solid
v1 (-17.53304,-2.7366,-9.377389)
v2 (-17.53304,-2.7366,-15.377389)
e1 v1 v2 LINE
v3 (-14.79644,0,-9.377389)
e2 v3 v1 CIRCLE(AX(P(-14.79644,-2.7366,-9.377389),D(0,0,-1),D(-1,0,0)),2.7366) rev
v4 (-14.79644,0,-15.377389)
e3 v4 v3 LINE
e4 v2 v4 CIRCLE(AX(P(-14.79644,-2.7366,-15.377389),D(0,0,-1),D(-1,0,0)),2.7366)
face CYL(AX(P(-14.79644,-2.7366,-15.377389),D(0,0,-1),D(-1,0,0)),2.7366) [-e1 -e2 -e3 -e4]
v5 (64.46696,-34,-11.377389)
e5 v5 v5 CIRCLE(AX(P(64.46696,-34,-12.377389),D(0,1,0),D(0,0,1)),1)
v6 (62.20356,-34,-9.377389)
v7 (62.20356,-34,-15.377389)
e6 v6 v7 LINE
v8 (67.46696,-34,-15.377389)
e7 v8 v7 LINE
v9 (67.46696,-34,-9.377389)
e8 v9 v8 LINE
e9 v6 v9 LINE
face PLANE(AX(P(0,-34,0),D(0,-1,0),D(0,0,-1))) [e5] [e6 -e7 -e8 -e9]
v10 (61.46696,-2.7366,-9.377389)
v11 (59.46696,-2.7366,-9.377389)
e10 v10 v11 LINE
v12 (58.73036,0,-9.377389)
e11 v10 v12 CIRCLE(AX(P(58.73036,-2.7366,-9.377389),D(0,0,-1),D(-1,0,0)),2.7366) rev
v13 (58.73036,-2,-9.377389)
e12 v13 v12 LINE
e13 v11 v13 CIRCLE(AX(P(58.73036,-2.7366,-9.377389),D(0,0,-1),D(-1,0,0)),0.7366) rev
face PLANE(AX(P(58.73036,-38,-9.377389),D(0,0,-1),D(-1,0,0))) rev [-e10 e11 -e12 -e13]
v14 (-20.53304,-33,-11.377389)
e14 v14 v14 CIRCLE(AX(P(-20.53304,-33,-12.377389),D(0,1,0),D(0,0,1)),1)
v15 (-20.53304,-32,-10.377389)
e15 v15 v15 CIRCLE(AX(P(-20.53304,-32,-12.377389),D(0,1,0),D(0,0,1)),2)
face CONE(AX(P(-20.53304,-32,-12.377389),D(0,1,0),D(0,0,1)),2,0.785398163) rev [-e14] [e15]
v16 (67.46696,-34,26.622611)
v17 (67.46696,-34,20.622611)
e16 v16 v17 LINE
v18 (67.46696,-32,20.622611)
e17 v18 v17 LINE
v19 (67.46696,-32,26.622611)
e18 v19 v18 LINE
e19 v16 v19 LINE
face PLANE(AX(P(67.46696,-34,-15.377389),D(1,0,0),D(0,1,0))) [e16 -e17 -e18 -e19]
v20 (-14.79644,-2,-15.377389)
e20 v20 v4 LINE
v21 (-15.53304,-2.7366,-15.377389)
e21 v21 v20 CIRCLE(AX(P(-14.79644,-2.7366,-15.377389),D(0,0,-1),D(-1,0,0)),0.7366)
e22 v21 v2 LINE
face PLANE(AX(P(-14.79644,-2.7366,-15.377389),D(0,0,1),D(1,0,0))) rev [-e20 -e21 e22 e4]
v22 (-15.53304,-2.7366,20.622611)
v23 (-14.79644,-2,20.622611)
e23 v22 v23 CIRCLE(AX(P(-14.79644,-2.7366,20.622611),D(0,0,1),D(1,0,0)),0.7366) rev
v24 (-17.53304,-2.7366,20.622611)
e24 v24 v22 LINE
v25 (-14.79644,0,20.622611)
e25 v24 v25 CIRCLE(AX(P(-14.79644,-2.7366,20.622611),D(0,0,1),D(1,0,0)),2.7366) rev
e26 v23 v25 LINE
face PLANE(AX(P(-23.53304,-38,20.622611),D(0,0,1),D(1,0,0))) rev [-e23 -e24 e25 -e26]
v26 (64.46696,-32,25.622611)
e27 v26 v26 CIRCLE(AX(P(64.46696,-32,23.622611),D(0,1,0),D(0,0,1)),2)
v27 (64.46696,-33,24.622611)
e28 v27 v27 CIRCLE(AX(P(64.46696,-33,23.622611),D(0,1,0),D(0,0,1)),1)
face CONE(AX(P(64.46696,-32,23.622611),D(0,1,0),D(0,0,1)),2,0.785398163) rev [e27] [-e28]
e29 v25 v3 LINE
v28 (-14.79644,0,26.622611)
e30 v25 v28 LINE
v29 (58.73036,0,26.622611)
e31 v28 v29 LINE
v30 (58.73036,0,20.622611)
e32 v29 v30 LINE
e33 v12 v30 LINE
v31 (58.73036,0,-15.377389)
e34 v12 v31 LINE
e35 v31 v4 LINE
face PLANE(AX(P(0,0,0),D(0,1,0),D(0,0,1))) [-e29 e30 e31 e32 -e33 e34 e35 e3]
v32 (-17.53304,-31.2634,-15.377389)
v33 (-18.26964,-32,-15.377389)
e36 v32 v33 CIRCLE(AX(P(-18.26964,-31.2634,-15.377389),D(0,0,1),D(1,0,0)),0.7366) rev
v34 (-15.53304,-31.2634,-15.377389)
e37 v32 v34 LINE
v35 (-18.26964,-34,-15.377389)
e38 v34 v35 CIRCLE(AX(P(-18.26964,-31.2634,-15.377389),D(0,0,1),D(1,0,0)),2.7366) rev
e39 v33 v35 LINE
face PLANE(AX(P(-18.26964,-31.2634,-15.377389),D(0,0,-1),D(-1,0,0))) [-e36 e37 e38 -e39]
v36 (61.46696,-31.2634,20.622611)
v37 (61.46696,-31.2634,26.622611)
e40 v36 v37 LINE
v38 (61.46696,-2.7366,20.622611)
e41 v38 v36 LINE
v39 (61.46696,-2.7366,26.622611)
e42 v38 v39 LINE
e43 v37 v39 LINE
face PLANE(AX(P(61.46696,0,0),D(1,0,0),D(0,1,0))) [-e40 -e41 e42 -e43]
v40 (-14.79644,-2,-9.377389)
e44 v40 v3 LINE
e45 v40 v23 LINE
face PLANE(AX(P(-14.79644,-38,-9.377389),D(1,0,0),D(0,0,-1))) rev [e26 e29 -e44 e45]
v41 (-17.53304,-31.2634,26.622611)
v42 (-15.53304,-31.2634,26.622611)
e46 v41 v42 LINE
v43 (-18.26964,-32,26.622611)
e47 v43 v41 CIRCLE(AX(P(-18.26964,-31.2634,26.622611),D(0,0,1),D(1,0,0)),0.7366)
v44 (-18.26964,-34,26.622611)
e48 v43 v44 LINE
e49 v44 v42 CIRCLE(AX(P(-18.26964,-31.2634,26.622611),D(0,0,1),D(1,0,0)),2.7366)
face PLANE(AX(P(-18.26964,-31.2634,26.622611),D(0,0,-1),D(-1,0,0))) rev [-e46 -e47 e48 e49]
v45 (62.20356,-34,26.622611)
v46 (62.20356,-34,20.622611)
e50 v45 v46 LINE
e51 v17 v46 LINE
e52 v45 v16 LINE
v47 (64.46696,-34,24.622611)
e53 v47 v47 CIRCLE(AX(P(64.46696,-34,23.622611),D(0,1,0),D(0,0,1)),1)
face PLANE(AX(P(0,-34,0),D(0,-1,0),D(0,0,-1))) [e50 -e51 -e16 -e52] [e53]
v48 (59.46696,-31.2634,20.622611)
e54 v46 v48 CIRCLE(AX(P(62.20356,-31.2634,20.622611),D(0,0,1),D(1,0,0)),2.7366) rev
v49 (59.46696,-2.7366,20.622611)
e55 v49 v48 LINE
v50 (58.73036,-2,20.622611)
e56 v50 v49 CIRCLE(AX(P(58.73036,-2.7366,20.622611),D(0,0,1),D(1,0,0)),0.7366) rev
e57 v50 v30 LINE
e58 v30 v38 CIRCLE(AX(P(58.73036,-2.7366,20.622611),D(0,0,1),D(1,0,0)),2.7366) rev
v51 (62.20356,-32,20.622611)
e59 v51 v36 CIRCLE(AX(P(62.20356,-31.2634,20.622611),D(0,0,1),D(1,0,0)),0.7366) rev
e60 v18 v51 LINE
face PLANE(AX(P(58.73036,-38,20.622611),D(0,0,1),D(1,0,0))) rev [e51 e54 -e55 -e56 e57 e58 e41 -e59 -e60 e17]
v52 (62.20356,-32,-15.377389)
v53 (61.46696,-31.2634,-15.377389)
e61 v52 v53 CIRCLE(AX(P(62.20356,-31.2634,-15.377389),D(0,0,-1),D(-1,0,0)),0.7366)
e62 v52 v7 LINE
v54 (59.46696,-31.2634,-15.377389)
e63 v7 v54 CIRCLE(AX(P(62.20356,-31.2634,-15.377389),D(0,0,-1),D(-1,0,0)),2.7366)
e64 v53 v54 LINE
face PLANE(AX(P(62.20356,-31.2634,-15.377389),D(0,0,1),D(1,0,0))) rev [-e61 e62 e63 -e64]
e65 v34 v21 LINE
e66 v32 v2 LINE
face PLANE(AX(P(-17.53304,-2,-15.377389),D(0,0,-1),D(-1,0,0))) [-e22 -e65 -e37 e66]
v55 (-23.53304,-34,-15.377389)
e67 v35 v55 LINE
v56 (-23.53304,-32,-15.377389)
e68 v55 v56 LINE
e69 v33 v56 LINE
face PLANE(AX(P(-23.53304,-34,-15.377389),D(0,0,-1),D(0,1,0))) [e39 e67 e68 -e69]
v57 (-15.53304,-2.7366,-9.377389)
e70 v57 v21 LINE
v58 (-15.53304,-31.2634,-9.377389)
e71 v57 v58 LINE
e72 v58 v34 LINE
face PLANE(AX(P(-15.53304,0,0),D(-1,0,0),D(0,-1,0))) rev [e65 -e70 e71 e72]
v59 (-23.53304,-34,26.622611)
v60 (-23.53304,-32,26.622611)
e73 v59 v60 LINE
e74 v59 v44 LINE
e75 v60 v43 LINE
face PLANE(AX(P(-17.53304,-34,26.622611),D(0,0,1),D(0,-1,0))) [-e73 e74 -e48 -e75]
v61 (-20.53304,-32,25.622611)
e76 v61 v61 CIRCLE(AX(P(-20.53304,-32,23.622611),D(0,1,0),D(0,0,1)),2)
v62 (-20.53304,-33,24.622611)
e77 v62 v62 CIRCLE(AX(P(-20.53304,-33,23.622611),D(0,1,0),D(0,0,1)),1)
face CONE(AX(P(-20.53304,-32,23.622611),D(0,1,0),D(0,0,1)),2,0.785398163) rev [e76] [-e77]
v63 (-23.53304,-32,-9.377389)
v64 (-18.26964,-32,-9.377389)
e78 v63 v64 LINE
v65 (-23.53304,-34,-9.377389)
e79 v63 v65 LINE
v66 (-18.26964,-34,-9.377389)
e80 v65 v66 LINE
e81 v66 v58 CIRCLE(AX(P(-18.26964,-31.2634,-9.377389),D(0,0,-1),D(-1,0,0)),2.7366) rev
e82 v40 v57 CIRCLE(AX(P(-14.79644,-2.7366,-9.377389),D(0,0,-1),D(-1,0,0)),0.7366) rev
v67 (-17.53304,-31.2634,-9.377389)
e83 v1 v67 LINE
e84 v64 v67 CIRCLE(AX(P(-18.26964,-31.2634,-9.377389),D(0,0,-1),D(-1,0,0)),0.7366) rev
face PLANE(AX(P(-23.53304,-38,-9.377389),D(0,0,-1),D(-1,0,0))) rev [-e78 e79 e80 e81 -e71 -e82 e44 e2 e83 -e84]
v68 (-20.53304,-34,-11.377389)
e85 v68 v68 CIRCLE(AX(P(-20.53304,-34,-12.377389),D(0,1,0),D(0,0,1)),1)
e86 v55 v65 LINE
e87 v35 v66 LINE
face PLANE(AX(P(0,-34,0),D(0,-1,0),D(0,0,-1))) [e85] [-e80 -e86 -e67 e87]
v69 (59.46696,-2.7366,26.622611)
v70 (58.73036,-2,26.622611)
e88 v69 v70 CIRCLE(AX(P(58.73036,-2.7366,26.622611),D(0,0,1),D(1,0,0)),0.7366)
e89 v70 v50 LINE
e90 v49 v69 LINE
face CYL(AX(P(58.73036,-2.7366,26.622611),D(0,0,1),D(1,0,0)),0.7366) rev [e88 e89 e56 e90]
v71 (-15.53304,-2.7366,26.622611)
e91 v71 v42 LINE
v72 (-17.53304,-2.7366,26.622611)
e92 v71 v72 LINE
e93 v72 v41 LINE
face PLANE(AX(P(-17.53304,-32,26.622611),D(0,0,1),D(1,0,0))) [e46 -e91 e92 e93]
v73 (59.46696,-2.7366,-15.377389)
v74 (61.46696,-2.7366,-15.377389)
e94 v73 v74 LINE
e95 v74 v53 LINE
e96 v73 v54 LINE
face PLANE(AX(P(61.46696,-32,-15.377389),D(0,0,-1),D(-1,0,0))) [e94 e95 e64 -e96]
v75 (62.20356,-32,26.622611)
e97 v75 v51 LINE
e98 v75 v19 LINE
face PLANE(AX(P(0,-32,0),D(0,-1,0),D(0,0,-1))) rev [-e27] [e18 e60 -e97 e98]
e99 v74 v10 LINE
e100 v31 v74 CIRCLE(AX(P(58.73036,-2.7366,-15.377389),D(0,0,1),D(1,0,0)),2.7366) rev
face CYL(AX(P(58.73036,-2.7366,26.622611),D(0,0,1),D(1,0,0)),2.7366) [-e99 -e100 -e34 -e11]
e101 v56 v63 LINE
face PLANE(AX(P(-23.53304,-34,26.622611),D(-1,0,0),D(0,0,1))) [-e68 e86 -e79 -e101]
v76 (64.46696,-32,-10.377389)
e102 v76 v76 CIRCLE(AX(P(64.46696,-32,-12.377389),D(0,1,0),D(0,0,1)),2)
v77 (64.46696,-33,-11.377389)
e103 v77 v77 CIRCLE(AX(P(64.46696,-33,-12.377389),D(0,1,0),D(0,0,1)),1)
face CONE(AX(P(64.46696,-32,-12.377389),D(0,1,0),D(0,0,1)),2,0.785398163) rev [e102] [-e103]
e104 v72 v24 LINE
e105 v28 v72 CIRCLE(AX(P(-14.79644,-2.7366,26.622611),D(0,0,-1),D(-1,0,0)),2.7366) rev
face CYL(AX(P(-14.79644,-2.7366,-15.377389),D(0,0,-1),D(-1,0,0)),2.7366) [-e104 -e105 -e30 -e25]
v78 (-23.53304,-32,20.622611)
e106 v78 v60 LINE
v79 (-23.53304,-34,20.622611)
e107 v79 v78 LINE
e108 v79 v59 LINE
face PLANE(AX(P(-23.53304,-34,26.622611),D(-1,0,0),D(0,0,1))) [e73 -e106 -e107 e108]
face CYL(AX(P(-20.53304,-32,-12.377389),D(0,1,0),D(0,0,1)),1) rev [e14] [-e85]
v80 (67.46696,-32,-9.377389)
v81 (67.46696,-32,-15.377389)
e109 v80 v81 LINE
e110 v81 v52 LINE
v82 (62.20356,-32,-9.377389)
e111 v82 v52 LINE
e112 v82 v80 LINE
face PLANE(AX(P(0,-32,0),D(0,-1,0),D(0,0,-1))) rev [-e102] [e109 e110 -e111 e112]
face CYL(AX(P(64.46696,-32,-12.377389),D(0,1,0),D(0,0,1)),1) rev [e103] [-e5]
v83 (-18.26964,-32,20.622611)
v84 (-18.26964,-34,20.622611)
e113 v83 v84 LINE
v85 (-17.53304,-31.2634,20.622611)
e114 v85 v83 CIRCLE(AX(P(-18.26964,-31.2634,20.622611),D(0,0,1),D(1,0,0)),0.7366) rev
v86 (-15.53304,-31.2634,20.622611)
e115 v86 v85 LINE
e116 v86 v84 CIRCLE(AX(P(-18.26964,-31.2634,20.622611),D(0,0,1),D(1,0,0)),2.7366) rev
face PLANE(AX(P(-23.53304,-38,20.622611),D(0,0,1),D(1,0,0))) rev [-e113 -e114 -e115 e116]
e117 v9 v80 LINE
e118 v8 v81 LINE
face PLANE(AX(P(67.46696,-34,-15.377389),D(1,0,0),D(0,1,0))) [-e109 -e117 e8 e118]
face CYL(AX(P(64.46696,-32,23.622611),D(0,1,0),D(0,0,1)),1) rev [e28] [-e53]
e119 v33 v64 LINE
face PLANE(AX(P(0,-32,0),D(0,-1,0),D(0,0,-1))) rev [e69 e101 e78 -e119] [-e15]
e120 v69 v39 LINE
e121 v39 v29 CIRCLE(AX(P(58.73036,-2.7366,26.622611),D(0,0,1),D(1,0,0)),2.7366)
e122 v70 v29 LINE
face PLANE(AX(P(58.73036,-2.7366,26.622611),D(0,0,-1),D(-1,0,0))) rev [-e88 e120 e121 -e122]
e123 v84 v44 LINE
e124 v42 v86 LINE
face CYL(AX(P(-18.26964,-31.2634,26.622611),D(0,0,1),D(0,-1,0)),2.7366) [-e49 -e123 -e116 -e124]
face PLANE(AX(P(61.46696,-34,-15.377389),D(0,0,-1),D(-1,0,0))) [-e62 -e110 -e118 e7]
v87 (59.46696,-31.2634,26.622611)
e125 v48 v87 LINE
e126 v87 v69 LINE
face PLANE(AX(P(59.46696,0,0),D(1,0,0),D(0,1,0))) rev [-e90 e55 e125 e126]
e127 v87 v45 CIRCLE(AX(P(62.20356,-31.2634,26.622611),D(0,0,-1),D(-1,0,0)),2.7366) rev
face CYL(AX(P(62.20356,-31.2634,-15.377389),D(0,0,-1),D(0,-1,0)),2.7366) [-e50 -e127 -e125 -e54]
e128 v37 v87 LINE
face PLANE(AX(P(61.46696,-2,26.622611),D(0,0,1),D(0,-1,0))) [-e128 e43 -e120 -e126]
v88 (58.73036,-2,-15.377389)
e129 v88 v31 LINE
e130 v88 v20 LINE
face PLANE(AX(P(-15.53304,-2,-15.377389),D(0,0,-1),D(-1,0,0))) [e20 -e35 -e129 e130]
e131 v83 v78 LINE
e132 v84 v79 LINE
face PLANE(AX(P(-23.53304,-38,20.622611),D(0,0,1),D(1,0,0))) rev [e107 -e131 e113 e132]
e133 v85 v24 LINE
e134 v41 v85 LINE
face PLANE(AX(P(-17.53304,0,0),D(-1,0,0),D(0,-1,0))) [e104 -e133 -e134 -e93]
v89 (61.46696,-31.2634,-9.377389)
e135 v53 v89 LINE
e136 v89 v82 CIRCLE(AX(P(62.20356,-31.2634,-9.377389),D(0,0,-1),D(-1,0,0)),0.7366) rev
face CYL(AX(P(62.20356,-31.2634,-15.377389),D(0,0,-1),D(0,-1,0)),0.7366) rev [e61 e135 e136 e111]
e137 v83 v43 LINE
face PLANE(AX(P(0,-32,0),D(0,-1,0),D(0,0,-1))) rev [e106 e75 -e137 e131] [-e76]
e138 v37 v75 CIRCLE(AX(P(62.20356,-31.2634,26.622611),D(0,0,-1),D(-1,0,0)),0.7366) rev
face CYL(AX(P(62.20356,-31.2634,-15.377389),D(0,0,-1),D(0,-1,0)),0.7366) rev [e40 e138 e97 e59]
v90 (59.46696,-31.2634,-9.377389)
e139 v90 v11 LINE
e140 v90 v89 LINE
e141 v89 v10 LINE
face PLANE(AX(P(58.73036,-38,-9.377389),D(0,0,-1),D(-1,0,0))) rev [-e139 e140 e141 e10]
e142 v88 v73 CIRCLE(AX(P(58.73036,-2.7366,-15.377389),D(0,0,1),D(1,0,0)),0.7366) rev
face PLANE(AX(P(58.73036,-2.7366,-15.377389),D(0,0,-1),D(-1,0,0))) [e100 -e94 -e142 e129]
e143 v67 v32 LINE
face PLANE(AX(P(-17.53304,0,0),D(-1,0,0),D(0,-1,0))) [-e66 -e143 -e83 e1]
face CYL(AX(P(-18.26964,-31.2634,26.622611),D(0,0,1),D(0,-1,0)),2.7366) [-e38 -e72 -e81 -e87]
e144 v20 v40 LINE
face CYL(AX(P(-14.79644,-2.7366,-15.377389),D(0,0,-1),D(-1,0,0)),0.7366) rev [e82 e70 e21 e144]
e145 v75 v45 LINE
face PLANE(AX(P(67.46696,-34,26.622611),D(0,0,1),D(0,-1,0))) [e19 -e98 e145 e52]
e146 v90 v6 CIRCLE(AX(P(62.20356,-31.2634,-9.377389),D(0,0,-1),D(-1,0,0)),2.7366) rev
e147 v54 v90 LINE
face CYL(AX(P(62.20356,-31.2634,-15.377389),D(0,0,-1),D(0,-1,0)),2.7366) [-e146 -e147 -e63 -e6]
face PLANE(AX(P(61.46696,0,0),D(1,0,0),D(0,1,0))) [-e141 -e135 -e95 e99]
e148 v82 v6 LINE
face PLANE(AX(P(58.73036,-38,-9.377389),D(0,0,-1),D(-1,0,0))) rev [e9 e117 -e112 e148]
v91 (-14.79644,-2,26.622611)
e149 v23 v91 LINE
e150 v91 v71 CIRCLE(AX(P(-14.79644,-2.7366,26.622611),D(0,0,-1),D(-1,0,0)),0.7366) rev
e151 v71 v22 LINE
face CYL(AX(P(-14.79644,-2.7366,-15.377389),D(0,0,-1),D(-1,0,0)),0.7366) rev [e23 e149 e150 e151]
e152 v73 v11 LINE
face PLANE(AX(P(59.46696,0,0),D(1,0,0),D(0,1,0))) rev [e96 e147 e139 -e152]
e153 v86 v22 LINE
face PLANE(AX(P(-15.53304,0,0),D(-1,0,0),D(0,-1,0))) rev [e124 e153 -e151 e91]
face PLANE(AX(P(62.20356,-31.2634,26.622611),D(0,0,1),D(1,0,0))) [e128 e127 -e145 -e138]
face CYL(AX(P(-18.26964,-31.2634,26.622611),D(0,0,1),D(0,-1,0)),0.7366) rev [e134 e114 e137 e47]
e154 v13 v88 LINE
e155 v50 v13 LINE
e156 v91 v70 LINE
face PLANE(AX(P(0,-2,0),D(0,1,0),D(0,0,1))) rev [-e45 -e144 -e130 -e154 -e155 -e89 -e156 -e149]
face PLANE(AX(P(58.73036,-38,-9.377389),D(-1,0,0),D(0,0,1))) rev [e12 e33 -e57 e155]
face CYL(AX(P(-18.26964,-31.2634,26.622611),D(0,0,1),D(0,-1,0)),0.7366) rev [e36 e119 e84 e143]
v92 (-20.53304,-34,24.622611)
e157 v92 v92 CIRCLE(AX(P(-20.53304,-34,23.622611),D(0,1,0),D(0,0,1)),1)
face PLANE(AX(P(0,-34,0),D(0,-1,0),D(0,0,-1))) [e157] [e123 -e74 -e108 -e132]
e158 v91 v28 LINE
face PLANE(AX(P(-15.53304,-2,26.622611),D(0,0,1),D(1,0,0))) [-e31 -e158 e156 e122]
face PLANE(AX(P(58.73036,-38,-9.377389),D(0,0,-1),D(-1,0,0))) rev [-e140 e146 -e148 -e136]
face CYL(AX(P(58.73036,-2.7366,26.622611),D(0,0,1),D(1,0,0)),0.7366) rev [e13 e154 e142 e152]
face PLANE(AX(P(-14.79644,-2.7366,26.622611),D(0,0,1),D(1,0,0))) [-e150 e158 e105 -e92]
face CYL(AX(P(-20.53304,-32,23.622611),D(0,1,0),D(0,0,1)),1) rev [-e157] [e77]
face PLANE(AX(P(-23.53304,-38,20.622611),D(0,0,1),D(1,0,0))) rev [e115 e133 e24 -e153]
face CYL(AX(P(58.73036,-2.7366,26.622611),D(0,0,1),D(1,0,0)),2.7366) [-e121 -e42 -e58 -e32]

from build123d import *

# Parameters (mm, degrees)
SKETCH_2_W                       = 75
SKETCH_2_H                       = 42
SM_BASE_FLANGE_1_DEPTH           = 2
SM_EDGE_FLANGE_1_STRIP_W         = 9.4732
SM_EDGE_FLANGE_1_STRIP_H         = 2
SM_EDGE_FLANGE_1_STRIP_CUT_DEPTH = 42
SM_EDGE_FLANGE_1_DEPTH           = 42
SM_EDGE_FLANGE_2_STRIP_W         = 9.4732
SM_EDGE_FLANGE_2_STRIP_H         = 2
SM_EDGE_FLANGE_2_STRIP_CUT_DEPTH = 42
SM_EDGE_FLANGE_2_DEPTH           = 42
SM_EDGE_FLANGE_3_STRIP_W         = 9.4732
SM_EDGE_FLANGE_3_STRIP_H         = 2
SM_EDGE_FLANGE_3_STRIP_CUT_DEPTH = 42
SM_EDGE_FLANGE_3_DEPTH           = 42
SM_EDGE_FLANGE_4_STRIP_W         = 9.4732
SM_EDGE_FLANGE_4_STRIP_H         = 2
SM_EDGE_FLANGE_4_STRIP_CUT_DEPTH = 42
SM_EDGE_FLANGE_4_DEPTH           = 42
HOLE_WIZARD_M2_4_AT_2_COUNT      = 2
HOLE_WIZARD_M2_4_AT_2_PITCH      = 36
HOLE_WIZARD_M2_4_AT_3_COUNT      = 2
HOLE_WIZARD_M2_4_AT_3_PITCH      = 85
HOLE_WIZARD_M2_4_AT_4_COUNT      = 2
HOLE_WIZARD_M2_4_AT_4_PITCH      = 92.309262807
SKETCH_27_W                      = 8.7366
SKETCH_27_H                      = 30
CUT_EXTRUDE_2319_DEPTH           = 38


# Sheet-metal steps are written as plain solids
with BuildPart() as part:
    # Sketch 2 → 基体-法兰1 (new body)
    with BuildSketch(Plane(origin=(0, 0, 0), x_dir=(1, 0, 0), z_dir=(0, 1, 0))):
        with Locations((21.966960091, -5.622610863)):
            Rectangle(SKETCH_2_W, SKETCH_2_H)
    extrude(amount=-SM_BASE_FLANGE_1_DEPTH)

    # 边线-法兰1 strip (across the edge) → 边线-法兰1 strip cut (cut)
    with BuildSketch(Plane(origin=(-15.533039909, -2, 26.622610863), x_dir=(1, 0, 0), z_dir=(0, 0, -1))):
        with Locations((-4, -1)):
            Rectangle(SM_EDGE_FLANGE_1_STRIP_W, SM_EDGE_FLANGE_1_STRIP_H)
    extrude(amount=SM_EDGE_FLANGE_1_STRIP_CUT_DEPTH, mode=Mode.SUBTRACT)

    # 边线-法兰1 section (across the edge) → 边线-法兰1 (add)
    with BuildSketch(Plane(origin=(-15.533039909, -2, 26.622610863), x_dir=(1, 0, 0), z_dir=(0, 0, -1))):
        with BuildLine():
            Line((-2, 0.7366), (-2, 30))
            Line((-2, 30), (0, 30))
            Line((0, 30), (0, 0.7366))
            ThreePointArc((0, 0.7366), (0.215745145, 0.215745145), (0.7366, 0))
            Line((0.7366, 0), (0.7366, -2))
            ThreePointArc((0.7366, -2), (-1.198468417, -1.198468417), (-2, 0.7366))
        make_face()
    extrude(amount=SM_EDGE_FLANGE_1_DEPTH)

    # 边线-法兰2 strip (across the edge) → 边线-法兰2 strip cut (cut)
    with BuildSketch(Plane(origin=(59.466960091, -2, -15.377389137), x_dir=(-1, 0, 0), z_dir=(0, 0, 1))):
        with Locations((-4, -1)):
            Rectangle(SM_EDGE_FLANGE_2_STRIP_W, SM_EDGE_FLANGE_2_STRIP_H)
    extrude(amount=SM_EDGE_FLANGE_2_STRIP_CUT_DEPTH, mode=Mode.SUBTRACT)

    # 边线-法兰2 section (across the edge) → 边线-法兰2 (add)
    with BuildSketch(Plane(origin=(59.466960091, -2, -15.377389137), x_dir=(-1, 0, 0), z_dir=(0, 0, 1))):
        with BuildLine():
            Line((-2, 0.7366), (-2, 30))
            Line((-2, 30), (0, 30))
            Line((0, 30), (0, 0.7366))
            ThreePointArc((0, 0.7366), (0.215745145, 0.215745145), (0.7366, 0))
            Line((0.7366, 0), (0.7366, -2))
            ThreePointArc((0.7366, -2), (-1.198468417, -1.198468417), (-2, 0.7366))
        make_face()
    extrude(amount=SM_EDGE_FLANGE_2_DEPTH)

    # 边线-法兰3 strip (across the edge) → 边线-法兰3 strip cut (cut)
    with BuildSketch(Plane(origin=(-17.533039909, -32, -15.377389137), x_dir=(0, 1, 0), z_dir=(0, 0, 1))):
        with Locations((-4, -1)):
            Rectangle(SM_EDGE_FLANGE_3_STRIP_W, SM_EDGE_FLANGE_3_STRIP_H)
    extrude(amount=SM_EDGE_FLANGE_3_STRIP_CUT_DEPTH, mode=Mode.SUBTRACT)

    # 边线-法兰3 section (across the edge) → 边线-法兰3 (add)
    with BuildSketch(Plane(origin=(-17.533039909, -32, -15.377389137), x_dir=(0, 1, 0), z_dir=(0, 0, 1))):
        with BuildLine():
            Line((-2, 0.7366), (-2, 6))
            Line((-2, 6), (0, 6))
            Line((0, 6), (0, 0.7366))
            ThreePointArc((0, 0.7366), (0.215745145, 0.215745145), (0.7366, 0))
            Line((0.7366, 0), (0.7366, -2))
            ThreePointArc((0.7366, -2), (-1.198468417, -1.198468417), (-2, 0.7366))
        make_face()
    extrude(amount=SM_EDGE_FLANGE_3_DEPTH)

    # 边线-法兰4 strip (across the edge) → 边线-法兰4 strip cut (cut)
    with BuildSketch(Plane(origin=(61.466960091, -32, 26.622610863), x_dir=(0, 1, 0), z_dir=(0, 0, -1))):
        with Locations((-4, -1)):
            Rectangle(SM_EDGE_FLANGE_4_STRIP_W, SM_EDGE_FLANGE_4_STRIP_H)
    extrude(amount=SM_EDGE_FLANGE_4_STRIP_CUT_DEPTH, mode=Mode.SUBTRACT)

    # 边线-法兰4 section (across the edge) → 边线-法兰4 (add)
    with BuildSketch(Plane(origin=(61.466960091, -32, 26.622610863), x_dir=(0, 1, 0), z_dir=(0, 0, -1))):
        with BuildLine():
            Line((-2, 0.7366), (-2, 6))
            Line((-2, 6), (0, 6))
            Line((0, 6), (0, 0.7366))
            ThreePointArc((0, 0.7366), (0.215745145, 0.215745145), (0.7366, 0))
            Line((0.7366, 0), (0.7366, -2))
            ThreePointArc((0.7366, -2), (-1.198468417, -1.198468417), (-2, 0.7366))
        make_face()
    extrude(amount=SM_EDGE_FLANGE_4_DEPTH)

    # 草图26 → M2*4 (revolve, cut)
    with BuildSketch(Plane(origin=(-20.533039909, -32, -12.377389137), x_dir=(0, 0, 1), z_dir=(1, 0, 0))):
        Polygon((0, 0), (0, 2), (1, 2), (1, 1), (2, 0), align=None)
    hole_wizard_m2_4 = revolve(axis=Axis((-20.533039909, -25.65, -12.377389137), (0, -1, 0)), mode=Mode.SUBTRACT)

    # M2*4 at 2: M2*4 ×2
    with Locations(*[(0, 0, i * HOLE_WIZARD_M2_4_AT_2_PITCH) for i in range(1, HOLE_WIZARD_M2_4_AT_2_COUNT)]):
        add(hole_wizard_m2_4, mode=Mode.SUBTRACT)

    # M2*4 at 3: M2*4 ×2
    with Locations(*[(i * HOLE_WIZARD_M2_4_AT_3_PITCH, 0, 0) for i in range(1, HOLE_WIZARD_M2_4_AT_3_COUNT)]):
        add(hole_wizard_m2_4, mode=Mode.SUBTRACT)

    # M2*4 at 4: M2*4 ×2
    with Locations(*[Vector(0.9208176667771376, 0, 0.38999336475266905) * (i * HOLE_WIZARD_M2_4_AT_4_PITCH) for i in range(1, HOLE_WIZARD_M2_4_AT_4_COUNT)]):
        add(hole_wizard_m2_4, mode=Mode.SUBTRACT)

    # 草图27 → Cut-Extrude 2319 (cut)
    with BuildSketch(Plane(origin=(0, 0, 0), x_dir=(1, 0, 0), z_dir=(0, 1, 0))):
        with Locations((-19.164739909, -5.622610863)):
            Rectangle(SKETCH_27_W, SKETCH_27_H)
        with Locations((63.098660091, -5.622610863)):
            Rectangle(SKETCH_27_W, SKETCH_27_H)
    extrude(amount=-CUT_EXTRUDE_2319_DEPTH, mode=Mode.SUBTRACT)


solid = part.part
